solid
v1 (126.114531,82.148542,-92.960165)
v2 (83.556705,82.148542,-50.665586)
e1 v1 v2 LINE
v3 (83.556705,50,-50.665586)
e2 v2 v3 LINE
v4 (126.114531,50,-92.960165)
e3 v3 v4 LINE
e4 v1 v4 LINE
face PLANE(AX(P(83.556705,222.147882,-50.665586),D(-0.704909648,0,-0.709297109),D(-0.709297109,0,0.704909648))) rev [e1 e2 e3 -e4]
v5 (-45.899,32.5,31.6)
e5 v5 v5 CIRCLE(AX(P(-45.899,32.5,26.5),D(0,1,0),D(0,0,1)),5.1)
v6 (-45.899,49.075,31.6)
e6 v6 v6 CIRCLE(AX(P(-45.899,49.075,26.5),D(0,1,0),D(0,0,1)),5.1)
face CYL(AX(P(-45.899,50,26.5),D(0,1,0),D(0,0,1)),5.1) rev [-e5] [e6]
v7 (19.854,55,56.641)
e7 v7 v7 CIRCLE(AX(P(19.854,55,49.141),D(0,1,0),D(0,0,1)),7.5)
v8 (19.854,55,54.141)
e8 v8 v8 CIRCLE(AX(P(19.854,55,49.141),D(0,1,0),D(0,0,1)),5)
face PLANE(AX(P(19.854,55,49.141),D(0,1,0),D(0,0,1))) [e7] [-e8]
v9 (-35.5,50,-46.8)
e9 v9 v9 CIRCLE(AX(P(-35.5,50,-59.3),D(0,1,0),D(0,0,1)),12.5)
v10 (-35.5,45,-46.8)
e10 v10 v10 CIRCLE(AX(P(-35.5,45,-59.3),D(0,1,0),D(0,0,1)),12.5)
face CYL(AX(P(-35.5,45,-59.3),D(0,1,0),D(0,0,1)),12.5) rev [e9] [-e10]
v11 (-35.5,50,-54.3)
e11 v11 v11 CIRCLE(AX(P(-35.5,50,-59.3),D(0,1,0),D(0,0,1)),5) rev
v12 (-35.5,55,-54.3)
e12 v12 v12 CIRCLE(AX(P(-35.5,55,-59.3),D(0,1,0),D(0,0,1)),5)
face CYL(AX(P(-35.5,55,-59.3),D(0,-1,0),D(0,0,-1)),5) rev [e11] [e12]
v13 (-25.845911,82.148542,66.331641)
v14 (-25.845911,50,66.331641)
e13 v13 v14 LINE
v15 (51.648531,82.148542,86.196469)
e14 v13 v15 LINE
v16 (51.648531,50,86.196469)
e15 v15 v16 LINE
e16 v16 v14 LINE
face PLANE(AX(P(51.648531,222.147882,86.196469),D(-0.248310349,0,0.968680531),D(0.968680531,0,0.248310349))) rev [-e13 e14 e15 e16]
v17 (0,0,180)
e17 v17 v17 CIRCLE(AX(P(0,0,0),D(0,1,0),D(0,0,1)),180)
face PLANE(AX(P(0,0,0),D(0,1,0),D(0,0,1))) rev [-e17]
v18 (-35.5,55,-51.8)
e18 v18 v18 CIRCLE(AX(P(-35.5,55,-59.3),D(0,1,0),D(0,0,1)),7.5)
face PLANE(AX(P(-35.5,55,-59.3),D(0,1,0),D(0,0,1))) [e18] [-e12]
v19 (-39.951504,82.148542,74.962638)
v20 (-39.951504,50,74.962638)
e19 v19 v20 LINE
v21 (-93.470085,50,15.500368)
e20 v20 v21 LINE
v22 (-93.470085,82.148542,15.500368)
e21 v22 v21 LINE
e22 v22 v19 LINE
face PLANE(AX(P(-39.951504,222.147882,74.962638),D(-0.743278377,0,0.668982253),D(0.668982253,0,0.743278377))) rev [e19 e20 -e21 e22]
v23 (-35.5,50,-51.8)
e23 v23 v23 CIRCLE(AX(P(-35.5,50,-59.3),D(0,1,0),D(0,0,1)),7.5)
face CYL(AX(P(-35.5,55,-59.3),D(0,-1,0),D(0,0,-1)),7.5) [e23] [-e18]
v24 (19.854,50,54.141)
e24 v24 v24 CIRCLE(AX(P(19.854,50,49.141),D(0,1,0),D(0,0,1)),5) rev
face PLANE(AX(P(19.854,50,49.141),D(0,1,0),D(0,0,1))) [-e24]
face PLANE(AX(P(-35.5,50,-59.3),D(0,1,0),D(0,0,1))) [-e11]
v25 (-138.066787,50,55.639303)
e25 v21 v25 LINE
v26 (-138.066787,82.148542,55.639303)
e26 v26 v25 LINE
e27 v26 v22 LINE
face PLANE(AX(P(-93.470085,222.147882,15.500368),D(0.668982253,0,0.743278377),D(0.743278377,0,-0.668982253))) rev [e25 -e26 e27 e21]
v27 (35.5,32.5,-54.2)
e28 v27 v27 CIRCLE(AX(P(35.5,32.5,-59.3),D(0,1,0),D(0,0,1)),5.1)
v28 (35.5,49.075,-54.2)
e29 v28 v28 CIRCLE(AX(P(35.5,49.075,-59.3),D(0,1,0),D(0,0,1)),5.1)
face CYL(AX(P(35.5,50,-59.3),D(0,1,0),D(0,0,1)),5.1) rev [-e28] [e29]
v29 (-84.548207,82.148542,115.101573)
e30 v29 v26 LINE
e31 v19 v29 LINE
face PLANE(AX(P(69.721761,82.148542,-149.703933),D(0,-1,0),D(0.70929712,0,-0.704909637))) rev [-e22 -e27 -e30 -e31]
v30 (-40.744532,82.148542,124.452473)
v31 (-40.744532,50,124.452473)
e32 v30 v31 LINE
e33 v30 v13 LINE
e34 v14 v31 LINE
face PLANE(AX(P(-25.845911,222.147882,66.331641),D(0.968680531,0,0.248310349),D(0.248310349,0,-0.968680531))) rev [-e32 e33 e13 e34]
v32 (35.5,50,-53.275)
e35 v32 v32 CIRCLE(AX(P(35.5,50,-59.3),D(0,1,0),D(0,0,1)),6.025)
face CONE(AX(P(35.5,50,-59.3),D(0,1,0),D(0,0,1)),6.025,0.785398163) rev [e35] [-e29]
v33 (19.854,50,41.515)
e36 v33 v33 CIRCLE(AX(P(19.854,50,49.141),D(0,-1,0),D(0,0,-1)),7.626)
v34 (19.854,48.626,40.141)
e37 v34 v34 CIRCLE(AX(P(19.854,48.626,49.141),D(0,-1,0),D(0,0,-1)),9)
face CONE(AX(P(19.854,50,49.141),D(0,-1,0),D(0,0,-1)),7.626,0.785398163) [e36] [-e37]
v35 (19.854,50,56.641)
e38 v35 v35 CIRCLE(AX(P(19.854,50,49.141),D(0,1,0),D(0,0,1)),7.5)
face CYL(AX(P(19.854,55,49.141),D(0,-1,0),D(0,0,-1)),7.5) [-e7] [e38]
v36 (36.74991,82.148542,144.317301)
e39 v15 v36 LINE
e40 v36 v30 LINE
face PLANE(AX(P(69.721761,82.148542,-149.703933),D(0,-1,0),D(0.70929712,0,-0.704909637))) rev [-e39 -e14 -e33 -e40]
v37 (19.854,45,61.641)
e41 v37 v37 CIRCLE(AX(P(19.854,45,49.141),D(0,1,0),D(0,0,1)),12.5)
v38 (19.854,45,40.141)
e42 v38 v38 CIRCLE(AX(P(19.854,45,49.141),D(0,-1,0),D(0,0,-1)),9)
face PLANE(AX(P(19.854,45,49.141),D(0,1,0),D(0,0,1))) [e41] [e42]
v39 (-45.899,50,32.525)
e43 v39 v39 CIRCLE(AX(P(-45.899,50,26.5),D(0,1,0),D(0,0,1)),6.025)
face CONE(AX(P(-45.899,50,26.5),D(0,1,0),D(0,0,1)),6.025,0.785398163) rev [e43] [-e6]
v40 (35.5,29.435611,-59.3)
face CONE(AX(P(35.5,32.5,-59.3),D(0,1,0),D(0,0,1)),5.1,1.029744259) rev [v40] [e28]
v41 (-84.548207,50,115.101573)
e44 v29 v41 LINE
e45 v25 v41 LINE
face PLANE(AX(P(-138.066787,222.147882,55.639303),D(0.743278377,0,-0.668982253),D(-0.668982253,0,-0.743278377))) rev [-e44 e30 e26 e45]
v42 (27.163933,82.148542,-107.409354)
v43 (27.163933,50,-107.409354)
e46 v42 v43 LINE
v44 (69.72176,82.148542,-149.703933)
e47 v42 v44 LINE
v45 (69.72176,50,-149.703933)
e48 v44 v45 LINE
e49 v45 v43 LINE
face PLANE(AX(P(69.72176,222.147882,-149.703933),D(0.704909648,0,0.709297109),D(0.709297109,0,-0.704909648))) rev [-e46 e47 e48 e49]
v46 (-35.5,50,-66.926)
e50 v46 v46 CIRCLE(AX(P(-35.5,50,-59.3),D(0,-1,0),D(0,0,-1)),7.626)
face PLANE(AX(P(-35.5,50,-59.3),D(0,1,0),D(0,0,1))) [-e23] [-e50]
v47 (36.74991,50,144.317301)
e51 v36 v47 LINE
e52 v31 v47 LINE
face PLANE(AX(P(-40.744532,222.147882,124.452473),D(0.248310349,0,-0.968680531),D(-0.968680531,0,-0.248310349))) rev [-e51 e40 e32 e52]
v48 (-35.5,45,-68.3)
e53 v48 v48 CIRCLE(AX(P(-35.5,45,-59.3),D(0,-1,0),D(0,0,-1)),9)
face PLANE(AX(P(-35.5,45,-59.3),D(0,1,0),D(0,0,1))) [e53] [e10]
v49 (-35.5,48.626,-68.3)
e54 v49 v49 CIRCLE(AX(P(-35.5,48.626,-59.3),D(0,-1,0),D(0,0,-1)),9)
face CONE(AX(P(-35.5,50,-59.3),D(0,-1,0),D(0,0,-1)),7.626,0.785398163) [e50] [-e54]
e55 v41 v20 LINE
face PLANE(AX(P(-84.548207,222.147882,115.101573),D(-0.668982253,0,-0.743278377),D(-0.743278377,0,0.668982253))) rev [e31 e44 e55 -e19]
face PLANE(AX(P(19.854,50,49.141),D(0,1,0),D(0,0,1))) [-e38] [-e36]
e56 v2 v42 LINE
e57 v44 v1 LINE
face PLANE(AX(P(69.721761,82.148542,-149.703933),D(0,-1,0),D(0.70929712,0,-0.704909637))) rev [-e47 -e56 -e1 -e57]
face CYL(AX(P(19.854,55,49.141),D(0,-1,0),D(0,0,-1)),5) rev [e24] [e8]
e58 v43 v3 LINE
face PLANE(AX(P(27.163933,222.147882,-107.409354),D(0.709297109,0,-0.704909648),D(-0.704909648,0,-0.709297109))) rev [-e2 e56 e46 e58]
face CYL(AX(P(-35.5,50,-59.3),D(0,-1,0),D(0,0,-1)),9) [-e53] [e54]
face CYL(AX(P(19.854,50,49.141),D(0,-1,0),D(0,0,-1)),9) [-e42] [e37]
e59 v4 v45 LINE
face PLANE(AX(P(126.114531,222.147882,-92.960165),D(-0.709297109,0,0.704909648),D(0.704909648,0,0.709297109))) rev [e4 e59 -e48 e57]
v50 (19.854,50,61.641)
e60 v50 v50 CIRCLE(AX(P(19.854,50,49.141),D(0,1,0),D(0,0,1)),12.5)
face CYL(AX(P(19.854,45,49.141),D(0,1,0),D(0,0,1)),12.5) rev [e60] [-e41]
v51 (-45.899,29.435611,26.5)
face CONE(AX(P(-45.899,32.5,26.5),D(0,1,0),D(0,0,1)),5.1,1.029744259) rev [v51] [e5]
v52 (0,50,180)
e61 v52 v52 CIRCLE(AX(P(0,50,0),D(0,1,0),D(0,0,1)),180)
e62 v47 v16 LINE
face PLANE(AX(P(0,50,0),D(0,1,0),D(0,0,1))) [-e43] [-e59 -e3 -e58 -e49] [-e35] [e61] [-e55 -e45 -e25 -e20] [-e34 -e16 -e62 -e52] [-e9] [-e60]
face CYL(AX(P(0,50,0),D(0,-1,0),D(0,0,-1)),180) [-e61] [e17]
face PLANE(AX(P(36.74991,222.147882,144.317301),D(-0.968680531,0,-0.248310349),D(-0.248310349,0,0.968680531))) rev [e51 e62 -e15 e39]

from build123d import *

# Parameters (mm, degrees)
SKETCH1_R                    = 180
BOSS_EXTRUDE1_DEPTH          = 50
BOSS_EXTRUDE2_DEPTH          = 32.148542
SKETCH3_R                    = 12.5
CUT_EXTRUDE1_DEPTH           = 5
M12_TAPPED_HOLE1_D           = 10.2
M12_TAPPED_HOLE1_DEPTH       = 17.5
M12_TAPPED_HOLE1_CSINK_D     = 12.05
M12_TAPPED_HOLE1_CSINK_ANGLE = 90
M12_TAPPED_HOLE1_TIP         = 3.064389157
SKETCH8_R                    = 10
BOSS_EXTRUDE3_DEPTH          = 5
SKETCH9_R                    = 7.5
SKETCH9_R_2                  = 5
BOSS_EXTRUDE4_DEPTH          = 5


# Read off the part's stored shape, not the designer's step: M18 Machine Threads Stud1, M18 Machine Threads Stud2
with BuildPart() as part:
    # Sketch1 → Boss-Extrude1 (new body)
    with BuildSketch(Plane(origin=(0, 0, 0), x_dir=(1, 0, 0), z_dir=(0, 1, 0))):
        with Locations(Location((0, 0, 0), (0, 0, 270))):
            Circle(SKETCH1_R)
    extrude(amount=BOSS_EXTRUDE1_DEPTH)

    # Sketch2 → Boss-Extrude2 (add)
    with BuildSketch(Plane(origin=(0, 50, 0), x_dir=(1, 0, 0), z_dir=(0, 1, 0))):
        Polygon((-84.548207039, -115.101573323), (-39.951504434, -74.962638151), (-93.470084664, -15.500368011), (-138.066787269, -55.639303183), align=None)
        Polygon((-40.744531967, -124.452472721), (36.749910483, -144.317300669), (51.648531443, -86.196468831), (-25.845911006, -66.331640884), align=None)
        Polygon((126.114531486, 92.960164639), (69.721759674, 149.703933348), (27.163933142, 107.409354489), (83.556704954, 50.66558578), align=None)
    extrude(amount=BOSS_EXTRUDE2_DEPTH)

    # Sketch3 → Cut-Extrude1 (cut)
    with BuildSketch(Plane(origin=(0, 50, 0), x_dir=(1, 0, 0), z_dir=(0, 1, 0))):
        with Locations(Location((-35.5, 59.3, 0), (0, 0, 270))):
            Circle(SKETCH3_R)
        with Locations(Location((19.854, -49.141, 0), (0, 0, 270))):
            Circle(SKETCH3_R)
    extrude(amount=-CUT_EXTRUDE1_DEPTH, mode=Mode.SUBTRACT)

    # M12 Tapped Hole1
    with Locations(Plane(origin=(0, 50, 0), x_dir=(1, 0, 0), z_dir=(0, 1, 0))):
        with Locations((35.5, 59.3), (-45.899, -26.5)):
            CounterSinkHole(M12_TAPPED_HOLE1_D / 2, M12_TAPPED_HOLE1_CSINK_D / 2, depth=M12_TAPPED_HOLE1_DEPTH, counter_sink_angle=M12_TAPPED_HOLE1_CSINK_ANGLE)
            with Locations((0, 0, -(M12_TAPPED_HOLE1_DEPTH + M12_TAPPED_HOLE1_TIP / 2))):  # 118° drill point
                Cone(0, M12_TAPPED_HOLE1_D / 2, M12_TAPPED_HOLE1_TIP, mode=Mode.SUBTRACT)

    # Sketch8 → Boss-Extrude3 (add)
    with BuildSketch(Plane(origin=(0, 45, 0), x_dir=(1, 0, 0), z_dir=(0, 1, 0))):
        with Locations(Location((-35.5, 59.3, 0), (0, 0, 270))):
            Circle(SKETCH8_R)
        with Locations(Location((19.854, -49.141, 0), (0, 0, 270))):
            Circle(SKETCH8_R)
    extrude(amount=BOSS_EXTRUDE3_DEPTH)

    # Sketch9 → Boss-Extrude4 (add)
    # profile 1 of 2: a face of its own
    with BuildSketch(Plane(origin=(0, 50, 0), x_dir=(1, 0, 0), z_dir=(0, 1, 0))):
        with Locations(Location((-35.5, 59.3, 0), (0, 0, 270))):
            Circle(SKETCH9_R)
        with Locations(Location((-35.5, 59.3, 0), (0, 0, 270))):
            Circle(SKETCH9_R_2, mode=Mode.SUBTRACT)
    # profile 2 of 2: a face of its own
    with BuildSketch(Plane(origin=(0, 50, 0), x_dir=(1, 0, 0), z_dir=(0, 1, 0))):
        with Locations(Location((19.854, -49.141, 0), (0, 0, 270))):
            Circle(SKETCH9_R)
        with Locations(Location((19.854, -49.141, 0), (0, 0, 270))):
            Circle(SKETCH9_R_2, mode=Mode.SUBTRACT)
    extrude(amount=BOSS_EXTRUDE4_DEPTH)

    # M18 Machine Threads Stud1 outline → M18 Machine Threads Stud1 (revolve, cut)
    with BuildSketch(Plane(origin=(-35.5, 0, -59.3), x_dir=(1, 0, 0), z_dir=(0, 0, 1))):
        Polygon((9, 48.626), (9, 45), (10, 45), (10, 50), (7.626, 50), align=None)
    revolve(axis=Axis((-35.5, 0, -59.3), (0, 1, 0)), mode=Mode.SUBTRACT)

    # M18 Machine Threads Stud2 outline → M18 Machine Threads Stud2 (revolve, cut)
    with BuildSketch(Plane(origin=(19.854, 0, 49.141), x_dir=(1, 0, 0), z_dir=(0, 0, 1))):
        Polygon((9, 48.626), (9, 45), (10, 45), (10, 50), (7.626, 50), align=None)
    revolve(axis=Axis((19.854, 0, 49.141), (0, 1, 0)), mode=Mode.SUBTRACT)


solid = part.part
